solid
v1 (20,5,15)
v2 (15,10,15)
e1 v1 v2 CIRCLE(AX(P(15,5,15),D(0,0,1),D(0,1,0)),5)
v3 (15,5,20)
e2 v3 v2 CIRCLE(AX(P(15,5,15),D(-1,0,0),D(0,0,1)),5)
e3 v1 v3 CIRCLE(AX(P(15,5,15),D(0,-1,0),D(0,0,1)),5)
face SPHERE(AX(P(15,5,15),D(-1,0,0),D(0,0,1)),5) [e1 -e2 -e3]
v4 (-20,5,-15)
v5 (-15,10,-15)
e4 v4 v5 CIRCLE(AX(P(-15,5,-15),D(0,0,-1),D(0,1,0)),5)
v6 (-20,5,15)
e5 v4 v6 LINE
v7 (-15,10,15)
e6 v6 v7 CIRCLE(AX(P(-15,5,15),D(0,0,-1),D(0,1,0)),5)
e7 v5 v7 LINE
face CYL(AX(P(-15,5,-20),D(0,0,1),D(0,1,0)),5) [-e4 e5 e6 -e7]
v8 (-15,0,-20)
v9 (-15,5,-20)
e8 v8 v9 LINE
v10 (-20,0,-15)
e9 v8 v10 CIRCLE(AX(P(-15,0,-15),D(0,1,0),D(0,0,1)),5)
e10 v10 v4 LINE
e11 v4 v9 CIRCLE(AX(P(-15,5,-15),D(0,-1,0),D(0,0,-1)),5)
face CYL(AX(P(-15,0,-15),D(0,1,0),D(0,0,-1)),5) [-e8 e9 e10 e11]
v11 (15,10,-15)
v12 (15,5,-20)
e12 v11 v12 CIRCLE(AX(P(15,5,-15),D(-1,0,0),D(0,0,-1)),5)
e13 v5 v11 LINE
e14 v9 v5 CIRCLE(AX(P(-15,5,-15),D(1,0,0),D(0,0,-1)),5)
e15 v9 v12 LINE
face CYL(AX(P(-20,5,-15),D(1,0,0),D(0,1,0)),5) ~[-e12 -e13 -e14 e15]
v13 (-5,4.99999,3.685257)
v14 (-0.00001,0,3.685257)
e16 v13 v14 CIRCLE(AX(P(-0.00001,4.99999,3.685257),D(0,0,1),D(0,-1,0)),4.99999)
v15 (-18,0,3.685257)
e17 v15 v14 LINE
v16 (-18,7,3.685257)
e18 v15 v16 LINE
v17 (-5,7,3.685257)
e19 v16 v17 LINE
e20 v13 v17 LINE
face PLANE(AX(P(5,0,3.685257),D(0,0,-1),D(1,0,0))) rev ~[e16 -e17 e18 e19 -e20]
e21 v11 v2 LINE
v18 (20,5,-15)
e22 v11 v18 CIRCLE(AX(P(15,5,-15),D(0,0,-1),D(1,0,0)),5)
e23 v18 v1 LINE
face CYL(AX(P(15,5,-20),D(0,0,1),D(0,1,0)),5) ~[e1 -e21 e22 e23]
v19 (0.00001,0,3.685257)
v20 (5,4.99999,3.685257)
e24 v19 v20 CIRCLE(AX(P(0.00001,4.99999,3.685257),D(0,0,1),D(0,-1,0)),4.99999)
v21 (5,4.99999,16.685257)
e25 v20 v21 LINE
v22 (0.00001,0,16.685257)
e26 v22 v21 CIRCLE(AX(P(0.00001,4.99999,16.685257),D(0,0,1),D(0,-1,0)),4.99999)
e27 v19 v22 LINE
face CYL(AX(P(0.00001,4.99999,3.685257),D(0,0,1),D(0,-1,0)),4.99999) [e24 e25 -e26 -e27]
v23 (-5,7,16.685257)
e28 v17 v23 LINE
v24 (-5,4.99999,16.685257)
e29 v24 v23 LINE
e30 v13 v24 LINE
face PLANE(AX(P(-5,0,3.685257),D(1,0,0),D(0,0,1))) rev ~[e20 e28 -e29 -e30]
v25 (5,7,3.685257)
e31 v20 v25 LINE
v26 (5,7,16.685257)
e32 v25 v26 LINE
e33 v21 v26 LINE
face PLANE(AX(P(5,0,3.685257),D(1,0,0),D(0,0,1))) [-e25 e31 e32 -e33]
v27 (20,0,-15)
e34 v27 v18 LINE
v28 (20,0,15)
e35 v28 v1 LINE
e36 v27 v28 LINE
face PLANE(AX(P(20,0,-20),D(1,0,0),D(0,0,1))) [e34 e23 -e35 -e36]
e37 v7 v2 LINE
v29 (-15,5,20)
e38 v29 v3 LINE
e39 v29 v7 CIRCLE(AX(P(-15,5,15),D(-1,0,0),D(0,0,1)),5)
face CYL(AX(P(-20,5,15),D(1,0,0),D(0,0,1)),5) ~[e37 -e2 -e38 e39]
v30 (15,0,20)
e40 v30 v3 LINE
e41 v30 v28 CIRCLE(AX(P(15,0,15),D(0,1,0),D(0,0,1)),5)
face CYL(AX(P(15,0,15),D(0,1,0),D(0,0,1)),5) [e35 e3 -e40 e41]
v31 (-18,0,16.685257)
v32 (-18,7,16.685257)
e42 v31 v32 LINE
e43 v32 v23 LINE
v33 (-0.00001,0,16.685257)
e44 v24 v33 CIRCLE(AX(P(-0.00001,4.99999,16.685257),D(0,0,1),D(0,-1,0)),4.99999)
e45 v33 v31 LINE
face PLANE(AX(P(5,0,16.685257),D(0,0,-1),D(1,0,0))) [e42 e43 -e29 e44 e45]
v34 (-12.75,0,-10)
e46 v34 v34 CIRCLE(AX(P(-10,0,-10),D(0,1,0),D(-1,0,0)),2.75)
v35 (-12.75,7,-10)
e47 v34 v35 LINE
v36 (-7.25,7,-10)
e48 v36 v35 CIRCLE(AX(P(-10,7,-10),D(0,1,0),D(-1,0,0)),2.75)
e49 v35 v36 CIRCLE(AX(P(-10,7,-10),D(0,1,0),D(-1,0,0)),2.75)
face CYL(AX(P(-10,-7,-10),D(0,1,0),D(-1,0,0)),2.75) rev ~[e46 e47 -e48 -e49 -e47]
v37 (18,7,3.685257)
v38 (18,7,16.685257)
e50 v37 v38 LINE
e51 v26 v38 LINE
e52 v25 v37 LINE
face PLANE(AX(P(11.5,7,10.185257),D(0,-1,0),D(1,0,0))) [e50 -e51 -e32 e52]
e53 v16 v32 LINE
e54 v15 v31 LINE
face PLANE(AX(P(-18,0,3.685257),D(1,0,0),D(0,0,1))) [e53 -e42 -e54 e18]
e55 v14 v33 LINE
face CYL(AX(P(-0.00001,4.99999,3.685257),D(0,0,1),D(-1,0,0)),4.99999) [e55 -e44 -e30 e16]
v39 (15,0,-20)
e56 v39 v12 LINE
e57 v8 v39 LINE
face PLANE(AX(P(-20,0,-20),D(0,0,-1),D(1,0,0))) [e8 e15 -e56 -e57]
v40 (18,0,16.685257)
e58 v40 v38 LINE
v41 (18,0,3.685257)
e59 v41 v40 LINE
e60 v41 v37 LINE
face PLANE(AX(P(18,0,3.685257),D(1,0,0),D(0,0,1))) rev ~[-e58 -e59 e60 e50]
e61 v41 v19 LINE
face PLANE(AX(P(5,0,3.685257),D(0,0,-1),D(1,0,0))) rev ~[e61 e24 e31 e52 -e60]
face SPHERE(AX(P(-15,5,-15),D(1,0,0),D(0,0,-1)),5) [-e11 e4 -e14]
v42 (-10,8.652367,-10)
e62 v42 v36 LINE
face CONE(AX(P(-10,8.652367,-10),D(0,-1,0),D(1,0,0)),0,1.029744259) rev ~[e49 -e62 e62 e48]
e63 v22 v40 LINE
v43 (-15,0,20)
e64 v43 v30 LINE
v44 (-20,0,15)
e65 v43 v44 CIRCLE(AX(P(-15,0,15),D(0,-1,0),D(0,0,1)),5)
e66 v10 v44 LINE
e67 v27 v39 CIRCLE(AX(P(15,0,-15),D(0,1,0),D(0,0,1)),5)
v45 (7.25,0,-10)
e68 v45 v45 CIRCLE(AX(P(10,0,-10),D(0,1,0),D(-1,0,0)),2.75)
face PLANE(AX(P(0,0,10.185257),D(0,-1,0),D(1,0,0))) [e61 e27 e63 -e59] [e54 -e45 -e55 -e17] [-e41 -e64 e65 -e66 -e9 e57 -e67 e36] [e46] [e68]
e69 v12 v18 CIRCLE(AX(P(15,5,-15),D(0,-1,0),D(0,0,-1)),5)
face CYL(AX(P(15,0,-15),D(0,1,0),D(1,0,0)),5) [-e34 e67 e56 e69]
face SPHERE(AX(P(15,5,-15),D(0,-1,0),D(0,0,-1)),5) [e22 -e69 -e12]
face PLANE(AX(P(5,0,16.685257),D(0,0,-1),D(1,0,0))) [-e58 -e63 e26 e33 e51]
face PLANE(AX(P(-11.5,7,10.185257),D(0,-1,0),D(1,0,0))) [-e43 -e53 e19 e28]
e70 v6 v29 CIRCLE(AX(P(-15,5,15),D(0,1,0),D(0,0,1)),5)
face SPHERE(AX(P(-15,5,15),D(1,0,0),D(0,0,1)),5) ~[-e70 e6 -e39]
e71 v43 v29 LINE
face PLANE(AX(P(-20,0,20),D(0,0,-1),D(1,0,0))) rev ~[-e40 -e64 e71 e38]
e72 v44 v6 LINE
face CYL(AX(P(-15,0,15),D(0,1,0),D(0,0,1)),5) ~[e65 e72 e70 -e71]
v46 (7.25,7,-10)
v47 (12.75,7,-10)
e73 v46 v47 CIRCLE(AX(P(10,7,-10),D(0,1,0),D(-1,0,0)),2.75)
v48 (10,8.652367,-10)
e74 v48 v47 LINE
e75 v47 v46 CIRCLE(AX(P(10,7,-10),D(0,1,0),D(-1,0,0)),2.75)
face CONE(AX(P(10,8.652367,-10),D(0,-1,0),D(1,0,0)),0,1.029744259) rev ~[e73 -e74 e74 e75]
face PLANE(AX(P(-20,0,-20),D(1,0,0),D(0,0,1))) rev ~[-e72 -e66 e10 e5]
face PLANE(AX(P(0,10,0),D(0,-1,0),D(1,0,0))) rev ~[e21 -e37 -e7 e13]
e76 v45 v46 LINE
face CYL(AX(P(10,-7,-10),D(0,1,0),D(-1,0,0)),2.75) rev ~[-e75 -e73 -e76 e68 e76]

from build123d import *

# Parameters (mm, degrees)
F0_W     = 40
F0_H     = 40
F0_W_2   = 13
F0_H_2   = 13
F1_DEPTH = 10
F2_DEPTH = 7
F0_W_3   = 10
F3_DEPTH = 10
F4_R     = 4.99999
F5_R     = 5
F6_D     = 5.5
F6_DEPTH = 7
F6_TIP   = 1.6523667023


# Not quite as in the source:
# - a fillet or chamfer is up to 0.001 mm smaller than in the source, because OpenCascade refuses the exact size
# - a feature names something its author has since deleted; it is built from what else it names


with BuildPart() as f1:
    # F0 (on Front) → F1 (new body)
    with BuildSketch(Plane.XZ):
        Rectangle(F0_W, F0_H)
        Polygon((-18, 3.6852569133), (-18, 16.6852569133), (-5, 16.6852569133), (5, 16.6852569133), (18, 16.6852569133), (18, 3.6852569133), (5, 3.6852569133), (-5, 3.6852569133), align=None, mode=Mode.SUBTRACT)
        with Locations((-11.5, 10.1852569133)):
            Rectangle(F0_W_2, F0_H_2)
        with Locations((11.5, 10.1852569133)):
            Rectangle(F0_W_2, F0_H_2)
    extrude(amount=-F1_DEPTH)

    # F0 (on Front) → F2 (cut)
    with BuildSketch(Plane.XZ):
        with Locations((-11.5, 10.1852569133)):
            Rectangle(F0_W_2, F0_H_2)
        with Locations((11.5, 10.1852569133)):
            Rectangle(F0_W_2, F0_H_2)
    extrude(amount=-F2_DEPTH, mode=Mode.SUBTRACT)

    # F0 (on Front) → F3 (join)
    with BuildSketch(Plane.XZ):
        with Locations((0, 10.1852569133)):
            Rectangle(F0_W_3, F0_H_2)
    extrude(amount=-F3_DEPTH)

    # F4 (radius 5 in the source; OpenCascade refuses exactly that, so slightly less here)
    f4_edges = [f1.edges().sort_by_distance(p)[0] for p in [
        (5, 0, 10.185257),
        (-5, 0, 10.185257),
    ]]
    fillet(f4_edges, radius=F4_R)

    # F5
    f5_edges = [f1.edges().sort_by_distance(p)[0] for p in [
        (0, 10, 20),
        (20, 5, 20),
        (-20, 5, 20),
        (20, 5, -20),
        (0, 10, -20),
        (-20, 5, -20),
        (-20, 10, 0),
        (20, 10, 0),
    ]]
    fillet(f5_edges, radius=F5_R)

    # F6
    with Locations(Plane.XZ):
        with Locations((-10, -10), (10, -10)):
            Hole(F6_D / 2, depth=F6_DEPTH)
            with Locations((0, 0, -(F6_DEPTH + F6_TIP / 2))):  # 118° drill point
                Cone(0, F6_D / 2, F6_TIP, mode=Mode.SUBTRACT)


solid = f1.part
